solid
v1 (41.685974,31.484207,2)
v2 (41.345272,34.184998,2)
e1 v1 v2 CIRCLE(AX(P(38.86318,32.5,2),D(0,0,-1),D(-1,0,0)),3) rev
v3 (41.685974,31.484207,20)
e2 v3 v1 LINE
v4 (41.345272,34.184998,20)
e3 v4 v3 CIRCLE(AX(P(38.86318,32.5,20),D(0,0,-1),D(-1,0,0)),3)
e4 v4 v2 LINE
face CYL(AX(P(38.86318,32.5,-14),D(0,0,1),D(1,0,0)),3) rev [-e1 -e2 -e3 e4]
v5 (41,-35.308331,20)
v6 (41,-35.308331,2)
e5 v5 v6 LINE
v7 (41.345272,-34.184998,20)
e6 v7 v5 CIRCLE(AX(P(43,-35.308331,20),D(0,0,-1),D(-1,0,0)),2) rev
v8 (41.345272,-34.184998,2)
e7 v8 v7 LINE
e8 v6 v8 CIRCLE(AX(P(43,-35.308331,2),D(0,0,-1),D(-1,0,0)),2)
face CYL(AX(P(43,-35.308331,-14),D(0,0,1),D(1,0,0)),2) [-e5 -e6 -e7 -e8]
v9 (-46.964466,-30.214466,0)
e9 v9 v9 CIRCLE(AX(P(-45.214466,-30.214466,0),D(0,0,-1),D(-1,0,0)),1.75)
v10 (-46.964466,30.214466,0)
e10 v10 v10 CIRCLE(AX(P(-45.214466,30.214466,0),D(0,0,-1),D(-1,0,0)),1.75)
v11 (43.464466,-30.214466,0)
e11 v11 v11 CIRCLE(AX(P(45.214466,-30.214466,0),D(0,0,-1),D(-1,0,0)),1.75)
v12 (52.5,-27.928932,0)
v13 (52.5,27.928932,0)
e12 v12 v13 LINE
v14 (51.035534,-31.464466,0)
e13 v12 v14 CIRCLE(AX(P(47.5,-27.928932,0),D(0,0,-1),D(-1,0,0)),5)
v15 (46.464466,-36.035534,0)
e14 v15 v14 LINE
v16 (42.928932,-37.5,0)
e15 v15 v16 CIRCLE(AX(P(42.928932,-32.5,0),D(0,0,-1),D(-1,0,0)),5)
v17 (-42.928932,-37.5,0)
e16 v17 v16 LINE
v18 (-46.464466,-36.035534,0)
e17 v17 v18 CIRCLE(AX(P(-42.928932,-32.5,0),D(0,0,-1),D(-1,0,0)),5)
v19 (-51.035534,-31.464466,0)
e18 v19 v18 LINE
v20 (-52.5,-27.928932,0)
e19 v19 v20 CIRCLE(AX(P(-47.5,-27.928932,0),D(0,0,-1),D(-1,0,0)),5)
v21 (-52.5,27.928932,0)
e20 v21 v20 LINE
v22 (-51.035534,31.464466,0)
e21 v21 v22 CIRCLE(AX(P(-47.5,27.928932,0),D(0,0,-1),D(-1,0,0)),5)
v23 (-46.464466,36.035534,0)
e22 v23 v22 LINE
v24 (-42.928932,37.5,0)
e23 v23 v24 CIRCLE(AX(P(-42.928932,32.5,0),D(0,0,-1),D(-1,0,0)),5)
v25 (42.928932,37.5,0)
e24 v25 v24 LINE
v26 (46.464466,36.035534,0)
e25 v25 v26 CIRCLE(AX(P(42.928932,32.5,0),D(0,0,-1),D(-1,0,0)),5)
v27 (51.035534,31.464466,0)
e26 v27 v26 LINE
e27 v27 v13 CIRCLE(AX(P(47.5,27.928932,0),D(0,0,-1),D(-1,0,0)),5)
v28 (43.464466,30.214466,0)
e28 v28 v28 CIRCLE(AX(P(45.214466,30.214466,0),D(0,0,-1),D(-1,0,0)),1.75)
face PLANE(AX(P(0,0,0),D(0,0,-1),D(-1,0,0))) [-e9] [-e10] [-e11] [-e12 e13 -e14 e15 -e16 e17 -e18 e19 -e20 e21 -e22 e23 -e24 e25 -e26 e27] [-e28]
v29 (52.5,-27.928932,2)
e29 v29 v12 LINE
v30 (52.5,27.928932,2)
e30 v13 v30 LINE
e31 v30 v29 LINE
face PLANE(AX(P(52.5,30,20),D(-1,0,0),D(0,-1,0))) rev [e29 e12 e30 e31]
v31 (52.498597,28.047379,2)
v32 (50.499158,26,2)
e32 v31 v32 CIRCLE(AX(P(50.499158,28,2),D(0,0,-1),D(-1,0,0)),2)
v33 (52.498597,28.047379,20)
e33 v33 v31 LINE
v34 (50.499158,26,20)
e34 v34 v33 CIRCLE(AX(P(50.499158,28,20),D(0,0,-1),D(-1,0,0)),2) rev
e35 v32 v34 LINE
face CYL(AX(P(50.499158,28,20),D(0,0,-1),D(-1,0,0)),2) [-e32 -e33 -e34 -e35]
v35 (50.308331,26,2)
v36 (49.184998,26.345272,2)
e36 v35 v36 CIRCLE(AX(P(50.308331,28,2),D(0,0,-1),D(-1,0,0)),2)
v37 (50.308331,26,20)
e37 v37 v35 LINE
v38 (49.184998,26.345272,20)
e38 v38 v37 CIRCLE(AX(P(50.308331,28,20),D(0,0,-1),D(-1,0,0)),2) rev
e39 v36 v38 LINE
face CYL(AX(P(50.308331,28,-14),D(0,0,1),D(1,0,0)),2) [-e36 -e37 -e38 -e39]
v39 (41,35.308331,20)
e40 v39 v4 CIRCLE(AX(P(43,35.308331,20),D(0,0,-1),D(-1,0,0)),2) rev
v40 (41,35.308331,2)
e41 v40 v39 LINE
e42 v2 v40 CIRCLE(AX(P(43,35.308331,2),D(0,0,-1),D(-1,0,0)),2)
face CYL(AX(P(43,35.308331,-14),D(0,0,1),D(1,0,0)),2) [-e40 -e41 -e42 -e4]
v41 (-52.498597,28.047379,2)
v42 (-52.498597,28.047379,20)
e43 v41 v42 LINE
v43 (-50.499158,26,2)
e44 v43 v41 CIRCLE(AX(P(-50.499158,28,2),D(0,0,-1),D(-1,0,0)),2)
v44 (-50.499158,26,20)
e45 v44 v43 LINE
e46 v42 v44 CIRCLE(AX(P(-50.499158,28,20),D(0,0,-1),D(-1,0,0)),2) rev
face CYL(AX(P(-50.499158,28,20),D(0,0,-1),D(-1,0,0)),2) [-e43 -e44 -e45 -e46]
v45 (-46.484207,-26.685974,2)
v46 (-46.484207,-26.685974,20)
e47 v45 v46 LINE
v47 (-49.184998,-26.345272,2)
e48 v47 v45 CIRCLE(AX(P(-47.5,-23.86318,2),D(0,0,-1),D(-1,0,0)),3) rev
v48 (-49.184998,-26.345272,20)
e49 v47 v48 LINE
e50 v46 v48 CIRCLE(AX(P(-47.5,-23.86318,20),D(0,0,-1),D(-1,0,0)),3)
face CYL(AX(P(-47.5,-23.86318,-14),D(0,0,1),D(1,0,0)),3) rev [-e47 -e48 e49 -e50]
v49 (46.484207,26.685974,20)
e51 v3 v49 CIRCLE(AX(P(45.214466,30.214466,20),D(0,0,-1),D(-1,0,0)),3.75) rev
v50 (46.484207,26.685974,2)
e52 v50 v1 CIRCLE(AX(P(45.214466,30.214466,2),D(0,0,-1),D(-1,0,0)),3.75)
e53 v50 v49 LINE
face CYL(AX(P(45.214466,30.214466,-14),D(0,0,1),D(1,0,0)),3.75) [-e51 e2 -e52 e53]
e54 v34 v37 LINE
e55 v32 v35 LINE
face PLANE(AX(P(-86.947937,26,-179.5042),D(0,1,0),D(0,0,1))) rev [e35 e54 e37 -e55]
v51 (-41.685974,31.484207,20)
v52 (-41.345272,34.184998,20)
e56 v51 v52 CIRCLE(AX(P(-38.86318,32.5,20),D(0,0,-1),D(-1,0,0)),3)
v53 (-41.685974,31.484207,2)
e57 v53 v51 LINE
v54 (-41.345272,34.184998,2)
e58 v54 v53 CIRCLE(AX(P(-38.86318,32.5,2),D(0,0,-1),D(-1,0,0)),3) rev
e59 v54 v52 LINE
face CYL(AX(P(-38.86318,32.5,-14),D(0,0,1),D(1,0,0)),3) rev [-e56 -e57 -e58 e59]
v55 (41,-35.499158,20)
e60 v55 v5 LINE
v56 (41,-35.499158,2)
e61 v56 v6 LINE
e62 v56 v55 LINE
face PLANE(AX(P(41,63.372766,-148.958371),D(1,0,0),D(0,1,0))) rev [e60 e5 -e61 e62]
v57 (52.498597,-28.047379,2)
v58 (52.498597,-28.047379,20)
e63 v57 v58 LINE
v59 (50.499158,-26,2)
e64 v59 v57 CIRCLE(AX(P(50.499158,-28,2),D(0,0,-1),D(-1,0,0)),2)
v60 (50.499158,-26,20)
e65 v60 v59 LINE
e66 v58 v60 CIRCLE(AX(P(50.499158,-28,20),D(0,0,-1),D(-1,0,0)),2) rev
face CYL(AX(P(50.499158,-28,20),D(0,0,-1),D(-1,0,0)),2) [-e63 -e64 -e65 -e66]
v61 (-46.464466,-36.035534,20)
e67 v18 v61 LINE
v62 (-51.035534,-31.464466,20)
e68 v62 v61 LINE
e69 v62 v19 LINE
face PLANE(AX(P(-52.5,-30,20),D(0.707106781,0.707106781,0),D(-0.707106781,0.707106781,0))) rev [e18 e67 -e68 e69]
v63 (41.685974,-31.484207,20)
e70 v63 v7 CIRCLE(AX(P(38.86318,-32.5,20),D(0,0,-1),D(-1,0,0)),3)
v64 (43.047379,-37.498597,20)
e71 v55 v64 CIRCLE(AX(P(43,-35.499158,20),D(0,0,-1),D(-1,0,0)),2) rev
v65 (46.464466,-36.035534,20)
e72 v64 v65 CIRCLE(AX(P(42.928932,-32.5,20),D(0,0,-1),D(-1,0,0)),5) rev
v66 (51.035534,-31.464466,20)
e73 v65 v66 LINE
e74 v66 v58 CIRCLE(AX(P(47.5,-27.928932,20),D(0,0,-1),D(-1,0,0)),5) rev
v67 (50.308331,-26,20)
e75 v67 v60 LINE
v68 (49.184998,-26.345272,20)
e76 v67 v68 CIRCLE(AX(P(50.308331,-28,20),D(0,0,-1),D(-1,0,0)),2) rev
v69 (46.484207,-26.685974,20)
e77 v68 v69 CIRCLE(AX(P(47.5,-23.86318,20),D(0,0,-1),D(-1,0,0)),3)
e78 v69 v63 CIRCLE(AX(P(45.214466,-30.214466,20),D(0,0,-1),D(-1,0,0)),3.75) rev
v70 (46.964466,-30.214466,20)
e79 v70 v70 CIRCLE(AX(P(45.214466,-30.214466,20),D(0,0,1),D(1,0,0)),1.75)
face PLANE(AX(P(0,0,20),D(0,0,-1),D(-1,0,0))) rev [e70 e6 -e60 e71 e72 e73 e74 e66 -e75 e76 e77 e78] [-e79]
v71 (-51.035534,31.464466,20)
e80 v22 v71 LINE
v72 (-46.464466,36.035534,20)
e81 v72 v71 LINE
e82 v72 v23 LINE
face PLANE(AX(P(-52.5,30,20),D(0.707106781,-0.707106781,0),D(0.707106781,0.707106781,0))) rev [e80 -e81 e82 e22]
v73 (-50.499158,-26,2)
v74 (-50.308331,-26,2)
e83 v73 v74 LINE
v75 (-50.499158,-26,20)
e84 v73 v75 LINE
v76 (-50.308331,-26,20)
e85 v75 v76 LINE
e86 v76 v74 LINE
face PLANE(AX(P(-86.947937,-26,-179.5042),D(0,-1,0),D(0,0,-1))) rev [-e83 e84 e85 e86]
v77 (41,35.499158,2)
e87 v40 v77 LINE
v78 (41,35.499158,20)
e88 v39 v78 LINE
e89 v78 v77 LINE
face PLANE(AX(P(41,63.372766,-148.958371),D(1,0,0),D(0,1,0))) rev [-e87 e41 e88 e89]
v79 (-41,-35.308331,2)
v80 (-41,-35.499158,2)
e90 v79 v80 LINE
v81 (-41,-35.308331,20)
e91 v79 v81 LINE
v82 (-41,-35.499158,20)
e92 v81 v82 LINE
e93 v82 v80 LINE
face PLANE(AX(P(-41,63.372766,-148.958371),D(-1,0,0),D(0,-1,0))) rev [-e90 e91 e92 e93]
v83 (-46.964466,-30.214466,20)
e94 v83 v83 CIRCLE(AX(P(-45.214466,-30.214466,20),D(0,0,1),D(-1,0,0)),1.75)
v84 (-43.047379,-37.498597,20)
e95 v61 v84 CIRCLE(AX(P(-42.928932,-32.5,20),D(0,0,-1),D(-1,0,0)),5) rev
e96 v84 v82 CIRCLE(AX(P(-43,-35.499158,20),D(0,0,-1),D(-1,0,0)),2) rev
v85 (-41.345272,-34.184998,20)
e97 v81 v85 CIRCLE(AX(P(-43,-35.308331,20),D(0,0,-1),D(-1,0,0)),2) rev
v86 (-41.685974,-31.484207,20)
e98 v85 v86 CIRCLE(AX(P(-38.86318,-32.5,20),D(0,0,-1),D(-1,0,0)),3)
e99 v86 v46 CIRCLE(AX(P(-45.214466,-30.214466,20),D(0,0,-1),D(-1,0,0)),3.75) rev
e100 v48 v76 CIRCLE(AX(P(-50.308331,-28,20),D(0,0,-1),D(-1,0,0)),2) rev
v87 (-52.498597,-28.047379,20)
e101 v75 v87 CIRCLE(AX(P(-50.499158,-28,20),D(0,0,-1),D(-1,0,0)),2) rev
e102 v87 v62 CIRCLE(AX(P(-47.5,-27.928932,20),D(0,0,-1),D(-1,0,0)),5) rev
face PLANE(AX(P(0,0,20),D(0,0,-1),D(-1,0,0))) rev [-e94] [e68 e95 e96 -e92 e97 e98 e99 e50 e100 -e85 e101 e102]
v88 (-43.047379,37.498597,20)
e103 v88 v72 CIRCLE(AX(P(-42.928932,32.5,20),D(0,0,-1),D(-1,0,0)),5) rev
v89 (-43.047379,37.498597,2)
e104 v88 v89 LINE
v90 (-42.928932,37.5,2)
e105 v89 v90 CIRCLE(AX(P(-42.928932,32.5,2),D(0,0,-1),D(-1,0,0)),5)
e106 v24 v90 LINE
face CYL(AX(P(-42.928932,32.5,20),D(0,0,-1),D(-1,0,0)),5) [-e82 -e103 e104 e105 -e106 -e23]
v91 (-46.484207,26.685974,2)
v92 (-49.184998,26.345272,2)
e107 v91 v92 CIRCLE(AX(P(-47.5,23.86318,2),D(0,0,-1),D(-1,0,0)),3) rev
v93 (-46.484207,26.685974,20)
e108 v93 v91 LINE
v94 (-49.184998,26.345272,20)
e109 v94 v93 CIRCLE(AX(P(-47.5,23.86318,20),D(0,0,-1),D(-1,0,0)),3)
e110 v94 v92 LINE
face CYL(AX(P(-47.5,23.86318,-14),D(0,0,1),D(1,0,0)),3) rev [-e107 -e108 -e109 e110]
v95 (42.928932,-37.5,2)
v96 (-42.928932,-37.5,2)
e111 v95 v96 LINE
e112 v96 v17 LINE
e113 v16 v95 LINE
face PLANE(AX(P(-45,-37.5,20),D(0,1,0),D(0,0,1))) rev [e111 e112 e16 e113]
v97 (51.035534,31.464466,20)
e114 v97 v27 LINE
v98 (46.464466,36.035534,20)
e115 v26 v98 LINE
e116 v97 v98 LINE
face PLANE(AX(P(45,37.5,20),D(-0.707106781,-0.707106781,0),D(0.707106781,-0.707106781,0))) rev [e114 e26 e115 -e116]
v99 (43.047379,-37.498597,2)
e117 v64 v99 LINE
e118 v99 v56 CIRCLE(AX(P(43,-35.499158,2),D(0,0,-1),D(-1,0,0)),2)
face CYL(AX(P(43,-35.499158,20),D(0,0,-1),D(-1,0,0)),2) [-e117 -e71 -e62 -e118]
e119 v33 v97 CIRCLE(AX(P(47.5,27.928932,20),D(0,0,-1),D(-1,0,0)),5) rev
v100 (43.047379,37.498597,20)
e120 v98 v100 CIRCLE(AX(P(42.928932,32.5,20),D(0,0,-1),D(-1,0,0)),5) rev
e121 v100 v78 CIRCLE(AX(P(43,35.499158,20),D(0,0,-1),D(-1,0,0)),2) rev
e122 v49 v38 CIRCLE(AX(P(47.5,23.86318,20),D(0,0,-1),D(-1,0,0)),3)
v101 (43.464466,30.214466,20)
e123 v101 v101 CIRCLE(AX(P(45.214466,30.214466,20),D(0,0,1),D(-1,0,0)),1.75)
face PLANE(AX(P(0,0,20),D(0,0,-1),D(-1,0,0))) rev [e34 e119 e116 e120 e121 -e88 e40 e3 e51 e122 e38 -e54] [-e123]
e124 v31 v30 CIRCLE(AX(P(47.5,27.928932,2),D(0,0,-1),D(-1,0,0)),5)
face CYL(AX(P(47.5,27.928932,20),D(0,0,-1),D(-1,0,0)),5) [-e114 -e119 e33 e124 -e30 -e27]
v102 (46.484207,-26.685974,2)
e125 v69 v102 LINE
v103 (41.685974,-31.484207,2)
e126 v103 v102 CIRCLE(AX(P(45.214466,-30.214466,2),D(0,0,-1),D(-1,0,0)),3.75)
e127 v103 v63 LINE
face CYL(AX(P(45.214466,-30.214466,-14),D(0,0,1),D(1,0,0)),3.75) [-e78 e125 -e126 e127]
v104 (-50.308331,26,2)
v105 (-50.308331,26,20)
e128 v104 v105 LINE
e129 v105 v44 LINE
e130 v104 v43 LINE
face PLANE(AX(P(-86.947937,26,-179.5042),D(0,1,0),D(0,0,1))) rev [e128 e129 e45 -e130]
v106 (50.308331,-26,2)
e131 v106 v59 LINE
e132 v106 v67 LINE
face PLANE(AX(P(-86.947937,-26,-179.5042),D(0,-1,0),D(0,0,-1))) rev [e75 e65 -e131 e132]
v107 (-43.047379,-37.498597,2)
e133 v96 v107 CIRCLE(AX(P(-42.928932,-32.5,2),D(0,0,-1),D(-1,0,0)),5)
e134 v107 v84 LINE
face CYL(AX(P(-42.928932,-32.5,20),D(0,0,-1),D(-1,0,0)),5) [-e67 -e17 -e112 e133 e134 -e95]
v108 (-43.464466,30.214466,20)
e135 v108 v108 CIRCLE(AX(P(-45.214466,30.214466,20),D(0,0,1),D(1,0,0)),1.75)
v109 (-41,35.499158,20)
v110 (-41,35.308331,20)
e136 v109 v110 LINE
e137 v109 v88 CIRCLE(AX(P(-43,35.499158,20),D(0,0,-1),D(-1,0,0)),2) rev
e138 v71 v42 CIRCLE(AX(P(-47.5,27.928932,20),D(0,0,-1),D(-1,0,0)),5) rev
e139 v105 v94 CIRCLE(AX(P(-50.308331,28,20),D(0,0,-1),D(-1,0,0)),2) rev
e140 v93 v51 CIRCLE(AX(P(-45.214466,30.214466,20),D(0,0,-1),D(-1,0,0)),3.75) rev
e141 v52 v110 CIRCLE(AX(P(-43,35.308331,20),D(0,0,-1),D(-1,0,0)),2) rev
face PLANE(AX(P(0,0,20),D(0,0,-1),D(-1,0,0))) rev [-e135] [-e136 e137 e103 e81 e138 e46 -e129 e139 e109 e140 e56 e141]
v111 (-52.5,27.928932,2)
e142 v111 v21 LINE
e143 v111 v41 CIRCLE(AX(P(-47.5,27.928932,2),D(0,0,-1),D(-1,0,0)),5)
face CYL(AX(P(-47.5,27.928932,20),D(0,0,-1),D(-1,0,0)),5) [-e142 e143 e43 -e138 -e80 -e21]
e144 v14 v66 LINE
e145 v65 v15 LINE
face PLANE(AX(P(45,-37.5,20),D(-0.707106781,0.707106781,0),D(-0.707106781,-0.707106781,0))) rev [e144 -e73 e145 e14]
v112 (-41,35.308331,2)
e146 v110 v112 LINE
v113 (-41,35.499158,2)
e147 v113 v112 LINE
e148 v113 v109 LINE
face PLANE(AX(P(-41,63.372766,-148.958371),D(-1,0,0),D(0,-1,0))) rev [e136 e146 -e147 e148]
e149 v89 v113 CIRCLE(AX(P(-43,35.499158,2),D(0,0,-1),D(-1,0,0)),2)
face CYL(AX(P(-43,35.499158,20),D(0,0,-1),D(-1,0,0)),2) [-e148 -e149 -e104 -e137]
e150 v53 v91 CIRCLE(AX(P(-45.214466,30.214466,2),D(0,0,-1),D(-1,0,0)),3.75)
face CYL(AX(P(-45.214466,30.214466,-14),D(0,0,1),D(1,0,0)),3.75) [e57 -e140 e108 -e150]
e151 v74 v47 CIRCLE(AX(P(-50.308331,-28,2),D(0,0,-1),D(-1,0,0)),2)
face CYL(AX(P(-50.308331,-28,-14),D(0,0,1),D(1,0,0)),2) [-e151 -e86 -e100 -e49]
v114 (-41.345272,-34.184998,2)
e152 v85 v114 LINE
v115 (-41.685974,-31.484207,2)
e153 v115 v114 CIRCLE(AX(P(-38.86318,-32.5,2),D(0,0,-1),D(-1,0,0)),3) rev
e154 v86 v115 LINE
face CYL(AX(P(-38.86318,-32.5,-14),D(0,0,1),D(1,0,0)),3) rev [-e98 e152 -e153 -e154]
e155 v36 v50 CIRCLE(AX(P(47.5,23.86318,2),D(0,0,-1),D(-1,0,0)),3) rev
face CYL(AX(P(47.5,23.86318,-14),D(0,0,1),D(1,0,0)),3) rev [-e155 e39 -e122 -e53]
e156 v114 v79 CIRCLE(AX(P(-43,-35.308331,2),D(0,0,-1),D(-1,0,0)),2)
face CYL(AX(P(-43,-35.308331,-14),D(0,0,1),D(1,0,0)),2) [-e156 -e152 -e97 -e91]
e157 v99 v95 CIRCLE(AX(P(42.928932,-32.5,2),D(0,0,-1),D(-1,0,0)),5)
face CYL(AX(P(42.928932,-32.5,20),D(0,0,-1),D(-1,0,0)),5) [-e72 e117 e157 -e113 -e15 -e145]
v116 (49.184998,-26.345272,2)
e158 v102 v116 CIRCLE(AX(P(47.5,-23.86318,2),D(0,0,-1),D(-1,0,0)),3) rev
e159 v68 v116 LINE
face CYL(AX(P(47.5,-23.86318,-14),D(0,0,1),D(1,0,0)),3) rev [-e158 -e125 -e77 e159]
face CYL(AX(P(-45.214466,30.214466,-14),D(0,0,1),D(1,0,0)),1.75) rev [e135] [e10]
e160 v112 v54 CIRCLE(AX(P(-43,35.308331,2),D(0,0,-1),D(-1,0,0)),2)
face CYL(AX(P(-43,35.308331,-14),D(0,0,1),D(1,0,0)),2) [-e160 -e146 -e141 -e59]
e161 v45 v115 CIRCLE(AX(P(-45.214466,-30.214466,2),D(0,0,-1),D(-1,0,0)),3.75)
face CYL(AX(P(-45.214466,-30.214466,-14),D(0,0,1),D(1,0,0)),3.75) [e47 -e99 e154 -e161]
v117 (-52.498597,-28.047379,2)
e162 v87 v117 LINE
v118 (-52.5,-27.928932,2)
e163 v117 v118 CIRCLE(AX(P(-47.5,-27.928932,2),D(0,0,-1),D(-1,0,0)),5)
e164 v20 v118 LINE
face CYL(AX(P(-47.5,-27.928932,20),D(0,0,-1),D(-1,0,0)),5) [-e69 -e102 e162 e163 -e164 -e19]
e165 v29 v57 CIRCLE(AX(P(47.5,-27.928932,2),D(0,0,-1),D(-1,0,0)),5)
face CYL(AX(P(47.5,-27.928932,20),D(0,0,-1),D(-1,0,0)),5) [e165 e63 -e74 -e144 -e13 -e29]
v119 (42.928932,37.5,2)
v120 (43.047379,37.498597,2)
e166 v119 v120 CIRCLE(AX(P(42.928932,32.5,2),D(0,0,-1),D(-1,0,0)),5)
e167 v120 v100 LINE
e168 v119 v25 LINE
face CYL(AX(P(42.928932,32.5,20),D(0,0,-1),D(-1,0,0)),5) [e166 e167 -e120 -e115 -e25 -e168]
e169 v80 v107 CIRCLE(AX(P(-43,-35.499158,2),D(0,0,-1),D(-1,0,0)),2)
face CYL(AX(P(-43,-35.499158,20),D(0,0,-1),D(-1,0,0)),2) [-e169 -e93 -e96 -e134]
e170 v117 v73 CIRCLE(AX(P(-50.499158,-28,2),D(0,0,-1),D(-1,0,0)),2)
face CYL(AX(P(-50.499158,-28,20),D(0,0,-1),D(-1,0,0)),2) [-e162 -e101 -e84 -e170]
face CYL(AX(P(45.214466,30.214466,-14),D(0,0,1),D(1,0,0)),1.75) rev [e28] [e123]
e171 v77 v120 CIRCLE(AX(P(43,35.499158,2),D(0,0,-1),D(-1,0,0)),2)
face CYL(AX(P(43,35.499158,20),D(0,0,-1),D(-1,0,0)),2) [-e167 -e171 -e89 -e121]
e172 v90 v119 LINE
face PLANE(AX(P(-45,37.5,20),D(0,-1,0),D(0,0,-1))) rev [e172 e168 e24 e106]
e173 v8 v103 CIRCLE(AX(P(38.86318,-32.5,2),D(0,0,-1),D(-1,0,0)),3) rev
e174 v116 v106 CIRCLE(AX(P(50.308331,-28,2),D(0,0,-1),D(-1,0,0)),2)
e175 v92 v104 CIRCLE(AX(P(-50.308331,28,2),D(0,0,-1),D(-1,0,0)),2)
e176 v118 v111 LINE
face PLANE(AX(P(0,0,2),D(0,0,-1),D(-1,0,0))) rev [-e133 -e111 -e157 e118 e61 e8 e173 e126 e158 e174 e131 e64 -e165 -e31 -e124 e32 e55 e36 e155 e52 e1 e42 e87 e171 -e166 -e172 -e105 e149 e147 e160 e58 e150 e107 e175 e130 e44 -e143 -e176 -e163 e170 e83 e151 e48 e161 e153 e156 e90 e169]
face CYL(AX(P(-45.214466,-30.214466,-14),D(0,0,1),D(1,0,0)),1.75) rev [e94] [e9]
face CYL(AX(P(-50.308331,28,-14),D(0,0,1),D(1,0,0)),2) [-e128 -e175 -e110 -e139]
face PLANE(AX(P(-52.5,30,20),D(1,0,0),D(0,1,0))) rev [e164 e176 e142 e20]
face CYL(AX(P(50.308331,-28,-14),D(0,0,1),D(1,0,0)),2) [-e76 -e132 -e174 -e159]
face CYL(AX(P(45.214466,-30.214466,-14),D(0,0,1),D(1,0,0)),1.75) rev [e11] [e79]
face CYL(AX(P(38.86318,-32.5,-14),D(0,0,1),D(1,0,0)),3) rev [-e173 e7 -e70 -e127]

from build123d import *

# Parameters (mm, degrees)
EXTRUDE_1_DEPTH     = 20
SKETCH_2_R          = 1.75
CUT_EXTRUDE_1_DEPTH = 34
SHELL_1_T           = -2
FILLET_1_R          = 10
FILLET_2_R          = 3
FILLET_3_R          = 5
SKETCH_4_W          = 82
SKETCH_4_H          = 126.745531776
CUT_EXTRUDE_2_DEPTH = 18
FILLET_4_R          = 2
CUT_EXTRUDE_START   = -18
SKETCH_5_W          = 173.89587329
SKETCH_5_H          = 52
CUT_EXTRUDE_3_DEPTH = 18
FILLET_5_R          = 2


with BuildPart() as part:
    # Эскиз1 → Бобышка-Вытянуть1 (new body)
    with BuildSketch(Plane.XY):
        Polygon((-52.5, 30), (-45, 37.5), (45, 37.5), (52.5, 30), (52.5, -30), (45, -37.5), (-45, -37.5), (-52.5, -30), align=None)
    extrude(amount=EXTRUDE_1_DEPTH)

    # Эскиз2 → Вырез-Вытянуть1 (cut)
    with BuildSketch(Plane.XY.offset(20)):
        with Locations((-45.214466094, 30.214466094)):
            Circle(SKETCH_2_R)
        with Locations(Location((45.214466094, 30.214466094, 0), (0, 0, 180))):
            Circle(SKETCH_2_R)
        with Locations((45.214466094, -30.214466094)):
            Circle(SKETCH_2_R)
        with Locations(Location((-45.214466094, -30.214466094, 0), (0, 0, 180))):
            Circle(SKETCH_2_R)
    extrude(amount=-CUT_EXTRUDE_1_DEPTH, mode=Mode.SUBTRACT)

    # Оболочка1
    shell_1_openings = [part.faces().sort_by_distance(p)[0] for p in [
        (0, 0, 20),
    ]]
    offset(amount=SHELL_1_T, openings=shell_1_openings, kind=Kind.INTERSECTION)

    # Скругление1
    # the kernel refuses this fillet: 10 mm, written as the material it adds along each edge
    with BuildSketch(Plane(origin=(-45.74479618, -33.926776695, 2), x_dir=(0.7071067811865442, -0.7071067811865507, 0), z_dir=(0, 0, 1)), Plane(origin=(48.926776695, -30.74479618, 2), x_dir=(0.7071067811865482, 0.7071067811865467, 0), z_dir=(0, 0, 1)), Plane(origin=(45.74479618, 33.926776695, 2), x_dir=(-0.707106781186546, 0.7071067811865492, 0), z_dir=(0, 0, 1)), Plane(origin=(-48.926776695, 30.74479618, 2), x_dir=(-0.7071067811865508, -0.7071067811865444, 0), z_dir=(0, 0, 1))) as fillet_1_piece_1:
        with BuildLine():
            CenterArc((11.477032042, 3.794412555), FILLET_1_R, 183.312134334, 18.986942704)
            Line((1.493736012, 3.21665797), (1.294070091, 3.205102878))
            ThreePointArc((1.294070091, 3.205102878), (0.969771845, 1.504817982), (-0.12, 0.16))
            Line((-0.12, 0.16), (0, -0.2))
            ThreePointArc((0, -0.2), (1.112436867, -0.2), (2.039830568, -0.075888251))
            Line((2.039830568, -0.075888251), (2.224873734, 0))
        make_face()
    extrude(amount=18)
    with BuildSketch(Plane(origin=(-48.926776695, -30.74479618, 2), x_dir=(0.34351243985929386, 0.9391481265816991, 0), z_dir=(0, 0, 1)), Plane(origin=(45.74479618, -33.926776695, 2), x_dir=(-0.9391481265817004, 0.34351243985929, 0), z_dir=(0, 0, 1)), Plane(origin=(48.926776695, 30.74479618, 2), x_dir=(-0.3435124398592874, -0.9391481265817014, 0), z_dir=(0, 0, 1)), Plane(origin=(-45.74479618, 33.926776695, 2), x_dir=(0.9391481265817011, -0.34351243985928803, 0), z_dir=(0, 0, 1))) as fillet_1_piece_2:
        with BuildLine():
            CenterArc((8.275322434, 8.811292173), FILLET_1_R, 222.791938952, 18.986942704)
            Line((0.937067943, 2.017911495), (0.790302854, 1.882043882))
            ThreePointArc((0.790302854, 1.882043882), (0.287138375, 1.093191354), (-0.181395597, 0.084235607))
            Line((-0.181395597, 0.084235607), (0.094575114, -0.176225843))
            ThreePointArc((0.094575114, -0.176225843), (1.773283379, 0.245765435), (3.451991644, -0.176225843))
            Line((3.451991644, -0.176225843), (3.546566758, 0))
        make_face()
    extrude(amount=18)

    # Скругление2
    fillet_2_edges = [part.edges().sort_by_distance(p)[0] for p in [
        (-50.5, 29.171572875, 11),
        (-44.171572875, 35.5, 11),
        (-44.171572875, -35.5, 11),
        (-50.5, -29.171572875, 11),
        (44.171572875, -35.5, 11),
        (50.5, -29.171572875, 11),
        (50.5, 29.171572875, 11),
        (44.171572875, 35.5, 11),
    ]]
    fillet(fillet_2_edges, radius=FILLET_2_R)

    # Скругление3
    fillet_3_edges = [part.edges().sort_by_distance(p)[0] for p in [
        (45, 37.5, 10),
        (52.5, 30, 10),
        (52.5, -30, 10),
        (45, -37.5, 10),
        (-45, -37.5, 10),
        (-52.5, -30, 10),
        (-52.5, 30, 10),
        (-45, 37.5, 10),
    ]]
    fillet(fillet_3_edges, radius=FILLET_3_R)

    # Эскиз4 → Вырез-Вытянуть2 (cut)
    with BuildSketch(Plane.XY.offset(20)):
        Rectangle(SKETCH_4_W, SKETCH_4_H)
    extrude(amount=-CUT_EXTRUDE_2_DEPTH, mode=Mode.SUBTRACT)

    # Скругление4
    # the kernel refuses this fillet: 2 mm, written as the material it takes off along each edge
    with BuildSketch(Plane(origin=(41, -34.605706623, 2), x_dir=(0, -1, 0), z_dir=(0, 0, 1)), Plane(origin=(41, 34.605706623, 21.756559814), x_dir=(0, 1, 0), z_dir=(0, 0, -1))) as fillet_4_piece_1:
        with BuildLine():
            CenterArc((0.702623926, 2), FILLET_4_R, 235.828901177, 34.171098823)
            ThreePointArc((-0.420708294, 0.345272009), (-0.20250821, 0.18219615), (0, 0))
            Line((0, 0), (0.702623926, 0))
        make_face()
    extrude(amount=19.756559814, mode=Mode.SUBTRACT)
    with BuildSketch(Plane(origin=(41, -37.5, 25.118447555), x_dir=(0.9999997651545144, 0.0006853400003404547, 0), z_dir=(0, 0, -1)), Plane(origin=(-41, -37.5, 2), x_dir=(-0.9999997651545144, 0.0006853400003439418, 0), z_dir=(0, 0, 1)), Plane(origin=(41, 37.5, 2), x_dir=(0.9999997651545144, -0.0006853400003439394, 0), z_dir=(0, 0, 1))) as fillet_4_piece_2:
        with BuildLine():
            CenterArc((2.001370787, -1.999470741), FILLET_4_R, 88.681844886, 91.357422207)
            Line((0.001371257, -2.000841421), (-0.198628696, -2.000978489))
            Line((-0.198628696, -2.000978489), (-0.199999953, -0.000137068))
            Line((-0.199999953, -0.000137068), (-0.000137068, 0.199999953))
            ThreePointArc((-0.000137068, 0.199999953), (1.928794667, 0.201321927), (2.051979846, 0.199947074))
            Line((2.051979846, 0.199947074), (2.047379022, 0))
        make_face()
    extrude(amount=23.118447555, mode=Mode.SUBTRACT)
    with BuildSketch(Plane(origin=(-41, -34.605706623, 2), x_dir=(0, -1, 0), z_dir=(0, 0, 1))) as fillet_4_piece_3:
        with BuildLine():
            CenterArc((0.702623926, -2), FILLET_4_R, 90, 34.171098823)
            ThreePointArc((-0.420708294, -0.345272009), (-0.20250821, -0.18219615), (0, 0))
            Line((0, 0), (0.702623926, 0))
        make_face()
    extrude(amount=19.756559814, mode=Mode.SUBTRACT)
    with BuildSketch(Plane(origin=(-41, 34.605706623, 21.756559814), x_dir=(-0.6343994710236062, -0.7730053758965514, 0), z_dir=(0, 0, -1))) as fillet_4_piece_4:
        with BuildLine():
            CenterArc((0.72566687, 1.991754999), FILLET_4_R, 230.624541426, 34.171098823)
            Line((-0.543132072, 0.445744247), (0, 0))
            ThreePointArc((0, 0), (0.272125076, 0.012367502), (0.544250153, 0))
        make_face()
    extrude(amount=19.756559814, mode=Mode.SUBTRACT)
    with BuildSketch(Plane(origin=(-41, 37.5, 25.118447555), x_dir=(0, -1, 0), z_dir=(0, 0, -1))) as fillet_4_piece_5:
        with BuildLine():
            CenterArc((2.00084189, 2), FILLET_4_R, 178.642577793, 91.357422207)
            Line((0.001403151, 2.047378541), (-0.198540723, 2.052116395))
            ThreePointArc((-0.198540723, 2.052116395), (-0.2, 1.928932188), (-0.2, 0))
            Line((-0.2, 0), (0, -0.2))
            Line((0, -0.2), (2.00084189, -0.2))
            Line((2.00084189, -0.2), (2.00084189, 0))
        make_face()
    extrude(amount=23.118447555, mode=Mode.SUBTRACT)

    # Эскиз5 → Вырез-Вытянуть3 (cut)
    with BuildSketch(Plane.XY.offset(20).offset(CUT_EXTRUDE_START)):
        Rectangle(SKETCH_5_W, SKETCH_5_H)
    extrude(amount=CUT_EXTRUDE_3_DEPTH, mode=Mode.SUBTRACT)

    # Скругление5
    # the kernel refuses this fillet: 2 mm, written as the material it takes off along each edge
    with BuildSketch(Plane(origin=(49.605706623, -26, 21.756559814), x_dir=(1, 0, 0), z_dir=(0, 0, -1)), Plane(origin=(-49.605706623, -26, 2), x_dir=(-1, 0, 0), z_dir=(0, 0, 1))) as fillet_5_piece_1:
        with BuildLine():
            CenterArc((0.702623926, 2), FILLET_5_R, 235.828901177, 34.171098823)
            ThreePointArc((-0.420708294, 0.345272009), (-0.20250821, 0.18219615), (0, 0))
            Line((0, 0), (0.702623926, 0))
        make_face()
    extrude(amount=19.756559814, mode=Mode.SUBTRACT)
    with BuildSketch(Plane(origin=(52.5, -26, 25.118447555), x_dir=(-0.0006853400003439216, -0.9999997651545144, 0), z_dir=(0, 0, -1)), Plane(origin=(52.5, 26, 2), x_dir=(-0.0006853400003439287, 0.9999997651545144, 0), z_dir=(0, 0, 1)), Plane(origin=(-52.5, -26, 2), x_dir=(0.0006853400003439322, -0.9999997651545144, 0), z_dir=(0, 0, 1)), Plane(origin=(-52.5, 26, 25.118447555), x_dir=(0.0006853400003439264, 0.9999997651545144, 0), z_dir=(0, 0, -1))) as fillet_5_piece_2:
        with BuildLine():
            CenterArc((2.001370787, 1.999470741), FILLET_5_R, 179.960732907, 91.357422207)
            Line((0.001371257, 2.000841421), (-0.198628696, 2.000978489))
            Line((-0.198628696, 2.000978489), (-0.199999953, 0.000137068))
            Line((-0.199999953, 0.000137068), (-0.000137068, -0.199999953))
            ThreePointArc((-0.000137068, -0.199999953), (1.928794667, -0.201321927), (2.051979846, -0.199947074))
            Line((2.051979846, -0.199947074), (2.047379022, 0))
        make_face()
    extrude(amount=23.118447555, mode=Mode.SUBTRACT)
    with BuildSketch(Plane(origin=(49.605706623, 26, 21.756559814), x_dir=(-0.7730053758965525, 0.6343994710236047, 1.8308445150644594e-15), z_dir=(0, 0, -1))) as fillet_5_piece_3:
        with BuildLine():
            CenterArc((0.72566687, 1.991754999), FILLET_5_R, 230.624541426, 34.171098823)
            Line((-0.543132072, 0.445744247), (0, 0))
            ThreePointArc((0, 0), (0.272125076, 0.012367502), (0.544250153, 0))
        make_face()
    extrude(amount=19.756559814, mode=Mode.SUBTRACT)
    with BuildSketch(Plane(origin=(-49.605706623, 26, 2), x_dir=(-1, 0, 0), z_dir=(0, 0, 1))) as fillet_5_piece_4:
        with BuildLine():
            CenterArc((0.702623926, -2), FILLET_5_R, 90, 34.171098823)
            ThreePointArc((-0.420708294, -0.345272009), (-0.20250821, -0.18219615), (0, 0))
            Line((0, 0), (0.702623926, 0))
        make_face()
    extrude(amount=19.756559814, mode=Mode.SUBTRACT)


solid = part.part
